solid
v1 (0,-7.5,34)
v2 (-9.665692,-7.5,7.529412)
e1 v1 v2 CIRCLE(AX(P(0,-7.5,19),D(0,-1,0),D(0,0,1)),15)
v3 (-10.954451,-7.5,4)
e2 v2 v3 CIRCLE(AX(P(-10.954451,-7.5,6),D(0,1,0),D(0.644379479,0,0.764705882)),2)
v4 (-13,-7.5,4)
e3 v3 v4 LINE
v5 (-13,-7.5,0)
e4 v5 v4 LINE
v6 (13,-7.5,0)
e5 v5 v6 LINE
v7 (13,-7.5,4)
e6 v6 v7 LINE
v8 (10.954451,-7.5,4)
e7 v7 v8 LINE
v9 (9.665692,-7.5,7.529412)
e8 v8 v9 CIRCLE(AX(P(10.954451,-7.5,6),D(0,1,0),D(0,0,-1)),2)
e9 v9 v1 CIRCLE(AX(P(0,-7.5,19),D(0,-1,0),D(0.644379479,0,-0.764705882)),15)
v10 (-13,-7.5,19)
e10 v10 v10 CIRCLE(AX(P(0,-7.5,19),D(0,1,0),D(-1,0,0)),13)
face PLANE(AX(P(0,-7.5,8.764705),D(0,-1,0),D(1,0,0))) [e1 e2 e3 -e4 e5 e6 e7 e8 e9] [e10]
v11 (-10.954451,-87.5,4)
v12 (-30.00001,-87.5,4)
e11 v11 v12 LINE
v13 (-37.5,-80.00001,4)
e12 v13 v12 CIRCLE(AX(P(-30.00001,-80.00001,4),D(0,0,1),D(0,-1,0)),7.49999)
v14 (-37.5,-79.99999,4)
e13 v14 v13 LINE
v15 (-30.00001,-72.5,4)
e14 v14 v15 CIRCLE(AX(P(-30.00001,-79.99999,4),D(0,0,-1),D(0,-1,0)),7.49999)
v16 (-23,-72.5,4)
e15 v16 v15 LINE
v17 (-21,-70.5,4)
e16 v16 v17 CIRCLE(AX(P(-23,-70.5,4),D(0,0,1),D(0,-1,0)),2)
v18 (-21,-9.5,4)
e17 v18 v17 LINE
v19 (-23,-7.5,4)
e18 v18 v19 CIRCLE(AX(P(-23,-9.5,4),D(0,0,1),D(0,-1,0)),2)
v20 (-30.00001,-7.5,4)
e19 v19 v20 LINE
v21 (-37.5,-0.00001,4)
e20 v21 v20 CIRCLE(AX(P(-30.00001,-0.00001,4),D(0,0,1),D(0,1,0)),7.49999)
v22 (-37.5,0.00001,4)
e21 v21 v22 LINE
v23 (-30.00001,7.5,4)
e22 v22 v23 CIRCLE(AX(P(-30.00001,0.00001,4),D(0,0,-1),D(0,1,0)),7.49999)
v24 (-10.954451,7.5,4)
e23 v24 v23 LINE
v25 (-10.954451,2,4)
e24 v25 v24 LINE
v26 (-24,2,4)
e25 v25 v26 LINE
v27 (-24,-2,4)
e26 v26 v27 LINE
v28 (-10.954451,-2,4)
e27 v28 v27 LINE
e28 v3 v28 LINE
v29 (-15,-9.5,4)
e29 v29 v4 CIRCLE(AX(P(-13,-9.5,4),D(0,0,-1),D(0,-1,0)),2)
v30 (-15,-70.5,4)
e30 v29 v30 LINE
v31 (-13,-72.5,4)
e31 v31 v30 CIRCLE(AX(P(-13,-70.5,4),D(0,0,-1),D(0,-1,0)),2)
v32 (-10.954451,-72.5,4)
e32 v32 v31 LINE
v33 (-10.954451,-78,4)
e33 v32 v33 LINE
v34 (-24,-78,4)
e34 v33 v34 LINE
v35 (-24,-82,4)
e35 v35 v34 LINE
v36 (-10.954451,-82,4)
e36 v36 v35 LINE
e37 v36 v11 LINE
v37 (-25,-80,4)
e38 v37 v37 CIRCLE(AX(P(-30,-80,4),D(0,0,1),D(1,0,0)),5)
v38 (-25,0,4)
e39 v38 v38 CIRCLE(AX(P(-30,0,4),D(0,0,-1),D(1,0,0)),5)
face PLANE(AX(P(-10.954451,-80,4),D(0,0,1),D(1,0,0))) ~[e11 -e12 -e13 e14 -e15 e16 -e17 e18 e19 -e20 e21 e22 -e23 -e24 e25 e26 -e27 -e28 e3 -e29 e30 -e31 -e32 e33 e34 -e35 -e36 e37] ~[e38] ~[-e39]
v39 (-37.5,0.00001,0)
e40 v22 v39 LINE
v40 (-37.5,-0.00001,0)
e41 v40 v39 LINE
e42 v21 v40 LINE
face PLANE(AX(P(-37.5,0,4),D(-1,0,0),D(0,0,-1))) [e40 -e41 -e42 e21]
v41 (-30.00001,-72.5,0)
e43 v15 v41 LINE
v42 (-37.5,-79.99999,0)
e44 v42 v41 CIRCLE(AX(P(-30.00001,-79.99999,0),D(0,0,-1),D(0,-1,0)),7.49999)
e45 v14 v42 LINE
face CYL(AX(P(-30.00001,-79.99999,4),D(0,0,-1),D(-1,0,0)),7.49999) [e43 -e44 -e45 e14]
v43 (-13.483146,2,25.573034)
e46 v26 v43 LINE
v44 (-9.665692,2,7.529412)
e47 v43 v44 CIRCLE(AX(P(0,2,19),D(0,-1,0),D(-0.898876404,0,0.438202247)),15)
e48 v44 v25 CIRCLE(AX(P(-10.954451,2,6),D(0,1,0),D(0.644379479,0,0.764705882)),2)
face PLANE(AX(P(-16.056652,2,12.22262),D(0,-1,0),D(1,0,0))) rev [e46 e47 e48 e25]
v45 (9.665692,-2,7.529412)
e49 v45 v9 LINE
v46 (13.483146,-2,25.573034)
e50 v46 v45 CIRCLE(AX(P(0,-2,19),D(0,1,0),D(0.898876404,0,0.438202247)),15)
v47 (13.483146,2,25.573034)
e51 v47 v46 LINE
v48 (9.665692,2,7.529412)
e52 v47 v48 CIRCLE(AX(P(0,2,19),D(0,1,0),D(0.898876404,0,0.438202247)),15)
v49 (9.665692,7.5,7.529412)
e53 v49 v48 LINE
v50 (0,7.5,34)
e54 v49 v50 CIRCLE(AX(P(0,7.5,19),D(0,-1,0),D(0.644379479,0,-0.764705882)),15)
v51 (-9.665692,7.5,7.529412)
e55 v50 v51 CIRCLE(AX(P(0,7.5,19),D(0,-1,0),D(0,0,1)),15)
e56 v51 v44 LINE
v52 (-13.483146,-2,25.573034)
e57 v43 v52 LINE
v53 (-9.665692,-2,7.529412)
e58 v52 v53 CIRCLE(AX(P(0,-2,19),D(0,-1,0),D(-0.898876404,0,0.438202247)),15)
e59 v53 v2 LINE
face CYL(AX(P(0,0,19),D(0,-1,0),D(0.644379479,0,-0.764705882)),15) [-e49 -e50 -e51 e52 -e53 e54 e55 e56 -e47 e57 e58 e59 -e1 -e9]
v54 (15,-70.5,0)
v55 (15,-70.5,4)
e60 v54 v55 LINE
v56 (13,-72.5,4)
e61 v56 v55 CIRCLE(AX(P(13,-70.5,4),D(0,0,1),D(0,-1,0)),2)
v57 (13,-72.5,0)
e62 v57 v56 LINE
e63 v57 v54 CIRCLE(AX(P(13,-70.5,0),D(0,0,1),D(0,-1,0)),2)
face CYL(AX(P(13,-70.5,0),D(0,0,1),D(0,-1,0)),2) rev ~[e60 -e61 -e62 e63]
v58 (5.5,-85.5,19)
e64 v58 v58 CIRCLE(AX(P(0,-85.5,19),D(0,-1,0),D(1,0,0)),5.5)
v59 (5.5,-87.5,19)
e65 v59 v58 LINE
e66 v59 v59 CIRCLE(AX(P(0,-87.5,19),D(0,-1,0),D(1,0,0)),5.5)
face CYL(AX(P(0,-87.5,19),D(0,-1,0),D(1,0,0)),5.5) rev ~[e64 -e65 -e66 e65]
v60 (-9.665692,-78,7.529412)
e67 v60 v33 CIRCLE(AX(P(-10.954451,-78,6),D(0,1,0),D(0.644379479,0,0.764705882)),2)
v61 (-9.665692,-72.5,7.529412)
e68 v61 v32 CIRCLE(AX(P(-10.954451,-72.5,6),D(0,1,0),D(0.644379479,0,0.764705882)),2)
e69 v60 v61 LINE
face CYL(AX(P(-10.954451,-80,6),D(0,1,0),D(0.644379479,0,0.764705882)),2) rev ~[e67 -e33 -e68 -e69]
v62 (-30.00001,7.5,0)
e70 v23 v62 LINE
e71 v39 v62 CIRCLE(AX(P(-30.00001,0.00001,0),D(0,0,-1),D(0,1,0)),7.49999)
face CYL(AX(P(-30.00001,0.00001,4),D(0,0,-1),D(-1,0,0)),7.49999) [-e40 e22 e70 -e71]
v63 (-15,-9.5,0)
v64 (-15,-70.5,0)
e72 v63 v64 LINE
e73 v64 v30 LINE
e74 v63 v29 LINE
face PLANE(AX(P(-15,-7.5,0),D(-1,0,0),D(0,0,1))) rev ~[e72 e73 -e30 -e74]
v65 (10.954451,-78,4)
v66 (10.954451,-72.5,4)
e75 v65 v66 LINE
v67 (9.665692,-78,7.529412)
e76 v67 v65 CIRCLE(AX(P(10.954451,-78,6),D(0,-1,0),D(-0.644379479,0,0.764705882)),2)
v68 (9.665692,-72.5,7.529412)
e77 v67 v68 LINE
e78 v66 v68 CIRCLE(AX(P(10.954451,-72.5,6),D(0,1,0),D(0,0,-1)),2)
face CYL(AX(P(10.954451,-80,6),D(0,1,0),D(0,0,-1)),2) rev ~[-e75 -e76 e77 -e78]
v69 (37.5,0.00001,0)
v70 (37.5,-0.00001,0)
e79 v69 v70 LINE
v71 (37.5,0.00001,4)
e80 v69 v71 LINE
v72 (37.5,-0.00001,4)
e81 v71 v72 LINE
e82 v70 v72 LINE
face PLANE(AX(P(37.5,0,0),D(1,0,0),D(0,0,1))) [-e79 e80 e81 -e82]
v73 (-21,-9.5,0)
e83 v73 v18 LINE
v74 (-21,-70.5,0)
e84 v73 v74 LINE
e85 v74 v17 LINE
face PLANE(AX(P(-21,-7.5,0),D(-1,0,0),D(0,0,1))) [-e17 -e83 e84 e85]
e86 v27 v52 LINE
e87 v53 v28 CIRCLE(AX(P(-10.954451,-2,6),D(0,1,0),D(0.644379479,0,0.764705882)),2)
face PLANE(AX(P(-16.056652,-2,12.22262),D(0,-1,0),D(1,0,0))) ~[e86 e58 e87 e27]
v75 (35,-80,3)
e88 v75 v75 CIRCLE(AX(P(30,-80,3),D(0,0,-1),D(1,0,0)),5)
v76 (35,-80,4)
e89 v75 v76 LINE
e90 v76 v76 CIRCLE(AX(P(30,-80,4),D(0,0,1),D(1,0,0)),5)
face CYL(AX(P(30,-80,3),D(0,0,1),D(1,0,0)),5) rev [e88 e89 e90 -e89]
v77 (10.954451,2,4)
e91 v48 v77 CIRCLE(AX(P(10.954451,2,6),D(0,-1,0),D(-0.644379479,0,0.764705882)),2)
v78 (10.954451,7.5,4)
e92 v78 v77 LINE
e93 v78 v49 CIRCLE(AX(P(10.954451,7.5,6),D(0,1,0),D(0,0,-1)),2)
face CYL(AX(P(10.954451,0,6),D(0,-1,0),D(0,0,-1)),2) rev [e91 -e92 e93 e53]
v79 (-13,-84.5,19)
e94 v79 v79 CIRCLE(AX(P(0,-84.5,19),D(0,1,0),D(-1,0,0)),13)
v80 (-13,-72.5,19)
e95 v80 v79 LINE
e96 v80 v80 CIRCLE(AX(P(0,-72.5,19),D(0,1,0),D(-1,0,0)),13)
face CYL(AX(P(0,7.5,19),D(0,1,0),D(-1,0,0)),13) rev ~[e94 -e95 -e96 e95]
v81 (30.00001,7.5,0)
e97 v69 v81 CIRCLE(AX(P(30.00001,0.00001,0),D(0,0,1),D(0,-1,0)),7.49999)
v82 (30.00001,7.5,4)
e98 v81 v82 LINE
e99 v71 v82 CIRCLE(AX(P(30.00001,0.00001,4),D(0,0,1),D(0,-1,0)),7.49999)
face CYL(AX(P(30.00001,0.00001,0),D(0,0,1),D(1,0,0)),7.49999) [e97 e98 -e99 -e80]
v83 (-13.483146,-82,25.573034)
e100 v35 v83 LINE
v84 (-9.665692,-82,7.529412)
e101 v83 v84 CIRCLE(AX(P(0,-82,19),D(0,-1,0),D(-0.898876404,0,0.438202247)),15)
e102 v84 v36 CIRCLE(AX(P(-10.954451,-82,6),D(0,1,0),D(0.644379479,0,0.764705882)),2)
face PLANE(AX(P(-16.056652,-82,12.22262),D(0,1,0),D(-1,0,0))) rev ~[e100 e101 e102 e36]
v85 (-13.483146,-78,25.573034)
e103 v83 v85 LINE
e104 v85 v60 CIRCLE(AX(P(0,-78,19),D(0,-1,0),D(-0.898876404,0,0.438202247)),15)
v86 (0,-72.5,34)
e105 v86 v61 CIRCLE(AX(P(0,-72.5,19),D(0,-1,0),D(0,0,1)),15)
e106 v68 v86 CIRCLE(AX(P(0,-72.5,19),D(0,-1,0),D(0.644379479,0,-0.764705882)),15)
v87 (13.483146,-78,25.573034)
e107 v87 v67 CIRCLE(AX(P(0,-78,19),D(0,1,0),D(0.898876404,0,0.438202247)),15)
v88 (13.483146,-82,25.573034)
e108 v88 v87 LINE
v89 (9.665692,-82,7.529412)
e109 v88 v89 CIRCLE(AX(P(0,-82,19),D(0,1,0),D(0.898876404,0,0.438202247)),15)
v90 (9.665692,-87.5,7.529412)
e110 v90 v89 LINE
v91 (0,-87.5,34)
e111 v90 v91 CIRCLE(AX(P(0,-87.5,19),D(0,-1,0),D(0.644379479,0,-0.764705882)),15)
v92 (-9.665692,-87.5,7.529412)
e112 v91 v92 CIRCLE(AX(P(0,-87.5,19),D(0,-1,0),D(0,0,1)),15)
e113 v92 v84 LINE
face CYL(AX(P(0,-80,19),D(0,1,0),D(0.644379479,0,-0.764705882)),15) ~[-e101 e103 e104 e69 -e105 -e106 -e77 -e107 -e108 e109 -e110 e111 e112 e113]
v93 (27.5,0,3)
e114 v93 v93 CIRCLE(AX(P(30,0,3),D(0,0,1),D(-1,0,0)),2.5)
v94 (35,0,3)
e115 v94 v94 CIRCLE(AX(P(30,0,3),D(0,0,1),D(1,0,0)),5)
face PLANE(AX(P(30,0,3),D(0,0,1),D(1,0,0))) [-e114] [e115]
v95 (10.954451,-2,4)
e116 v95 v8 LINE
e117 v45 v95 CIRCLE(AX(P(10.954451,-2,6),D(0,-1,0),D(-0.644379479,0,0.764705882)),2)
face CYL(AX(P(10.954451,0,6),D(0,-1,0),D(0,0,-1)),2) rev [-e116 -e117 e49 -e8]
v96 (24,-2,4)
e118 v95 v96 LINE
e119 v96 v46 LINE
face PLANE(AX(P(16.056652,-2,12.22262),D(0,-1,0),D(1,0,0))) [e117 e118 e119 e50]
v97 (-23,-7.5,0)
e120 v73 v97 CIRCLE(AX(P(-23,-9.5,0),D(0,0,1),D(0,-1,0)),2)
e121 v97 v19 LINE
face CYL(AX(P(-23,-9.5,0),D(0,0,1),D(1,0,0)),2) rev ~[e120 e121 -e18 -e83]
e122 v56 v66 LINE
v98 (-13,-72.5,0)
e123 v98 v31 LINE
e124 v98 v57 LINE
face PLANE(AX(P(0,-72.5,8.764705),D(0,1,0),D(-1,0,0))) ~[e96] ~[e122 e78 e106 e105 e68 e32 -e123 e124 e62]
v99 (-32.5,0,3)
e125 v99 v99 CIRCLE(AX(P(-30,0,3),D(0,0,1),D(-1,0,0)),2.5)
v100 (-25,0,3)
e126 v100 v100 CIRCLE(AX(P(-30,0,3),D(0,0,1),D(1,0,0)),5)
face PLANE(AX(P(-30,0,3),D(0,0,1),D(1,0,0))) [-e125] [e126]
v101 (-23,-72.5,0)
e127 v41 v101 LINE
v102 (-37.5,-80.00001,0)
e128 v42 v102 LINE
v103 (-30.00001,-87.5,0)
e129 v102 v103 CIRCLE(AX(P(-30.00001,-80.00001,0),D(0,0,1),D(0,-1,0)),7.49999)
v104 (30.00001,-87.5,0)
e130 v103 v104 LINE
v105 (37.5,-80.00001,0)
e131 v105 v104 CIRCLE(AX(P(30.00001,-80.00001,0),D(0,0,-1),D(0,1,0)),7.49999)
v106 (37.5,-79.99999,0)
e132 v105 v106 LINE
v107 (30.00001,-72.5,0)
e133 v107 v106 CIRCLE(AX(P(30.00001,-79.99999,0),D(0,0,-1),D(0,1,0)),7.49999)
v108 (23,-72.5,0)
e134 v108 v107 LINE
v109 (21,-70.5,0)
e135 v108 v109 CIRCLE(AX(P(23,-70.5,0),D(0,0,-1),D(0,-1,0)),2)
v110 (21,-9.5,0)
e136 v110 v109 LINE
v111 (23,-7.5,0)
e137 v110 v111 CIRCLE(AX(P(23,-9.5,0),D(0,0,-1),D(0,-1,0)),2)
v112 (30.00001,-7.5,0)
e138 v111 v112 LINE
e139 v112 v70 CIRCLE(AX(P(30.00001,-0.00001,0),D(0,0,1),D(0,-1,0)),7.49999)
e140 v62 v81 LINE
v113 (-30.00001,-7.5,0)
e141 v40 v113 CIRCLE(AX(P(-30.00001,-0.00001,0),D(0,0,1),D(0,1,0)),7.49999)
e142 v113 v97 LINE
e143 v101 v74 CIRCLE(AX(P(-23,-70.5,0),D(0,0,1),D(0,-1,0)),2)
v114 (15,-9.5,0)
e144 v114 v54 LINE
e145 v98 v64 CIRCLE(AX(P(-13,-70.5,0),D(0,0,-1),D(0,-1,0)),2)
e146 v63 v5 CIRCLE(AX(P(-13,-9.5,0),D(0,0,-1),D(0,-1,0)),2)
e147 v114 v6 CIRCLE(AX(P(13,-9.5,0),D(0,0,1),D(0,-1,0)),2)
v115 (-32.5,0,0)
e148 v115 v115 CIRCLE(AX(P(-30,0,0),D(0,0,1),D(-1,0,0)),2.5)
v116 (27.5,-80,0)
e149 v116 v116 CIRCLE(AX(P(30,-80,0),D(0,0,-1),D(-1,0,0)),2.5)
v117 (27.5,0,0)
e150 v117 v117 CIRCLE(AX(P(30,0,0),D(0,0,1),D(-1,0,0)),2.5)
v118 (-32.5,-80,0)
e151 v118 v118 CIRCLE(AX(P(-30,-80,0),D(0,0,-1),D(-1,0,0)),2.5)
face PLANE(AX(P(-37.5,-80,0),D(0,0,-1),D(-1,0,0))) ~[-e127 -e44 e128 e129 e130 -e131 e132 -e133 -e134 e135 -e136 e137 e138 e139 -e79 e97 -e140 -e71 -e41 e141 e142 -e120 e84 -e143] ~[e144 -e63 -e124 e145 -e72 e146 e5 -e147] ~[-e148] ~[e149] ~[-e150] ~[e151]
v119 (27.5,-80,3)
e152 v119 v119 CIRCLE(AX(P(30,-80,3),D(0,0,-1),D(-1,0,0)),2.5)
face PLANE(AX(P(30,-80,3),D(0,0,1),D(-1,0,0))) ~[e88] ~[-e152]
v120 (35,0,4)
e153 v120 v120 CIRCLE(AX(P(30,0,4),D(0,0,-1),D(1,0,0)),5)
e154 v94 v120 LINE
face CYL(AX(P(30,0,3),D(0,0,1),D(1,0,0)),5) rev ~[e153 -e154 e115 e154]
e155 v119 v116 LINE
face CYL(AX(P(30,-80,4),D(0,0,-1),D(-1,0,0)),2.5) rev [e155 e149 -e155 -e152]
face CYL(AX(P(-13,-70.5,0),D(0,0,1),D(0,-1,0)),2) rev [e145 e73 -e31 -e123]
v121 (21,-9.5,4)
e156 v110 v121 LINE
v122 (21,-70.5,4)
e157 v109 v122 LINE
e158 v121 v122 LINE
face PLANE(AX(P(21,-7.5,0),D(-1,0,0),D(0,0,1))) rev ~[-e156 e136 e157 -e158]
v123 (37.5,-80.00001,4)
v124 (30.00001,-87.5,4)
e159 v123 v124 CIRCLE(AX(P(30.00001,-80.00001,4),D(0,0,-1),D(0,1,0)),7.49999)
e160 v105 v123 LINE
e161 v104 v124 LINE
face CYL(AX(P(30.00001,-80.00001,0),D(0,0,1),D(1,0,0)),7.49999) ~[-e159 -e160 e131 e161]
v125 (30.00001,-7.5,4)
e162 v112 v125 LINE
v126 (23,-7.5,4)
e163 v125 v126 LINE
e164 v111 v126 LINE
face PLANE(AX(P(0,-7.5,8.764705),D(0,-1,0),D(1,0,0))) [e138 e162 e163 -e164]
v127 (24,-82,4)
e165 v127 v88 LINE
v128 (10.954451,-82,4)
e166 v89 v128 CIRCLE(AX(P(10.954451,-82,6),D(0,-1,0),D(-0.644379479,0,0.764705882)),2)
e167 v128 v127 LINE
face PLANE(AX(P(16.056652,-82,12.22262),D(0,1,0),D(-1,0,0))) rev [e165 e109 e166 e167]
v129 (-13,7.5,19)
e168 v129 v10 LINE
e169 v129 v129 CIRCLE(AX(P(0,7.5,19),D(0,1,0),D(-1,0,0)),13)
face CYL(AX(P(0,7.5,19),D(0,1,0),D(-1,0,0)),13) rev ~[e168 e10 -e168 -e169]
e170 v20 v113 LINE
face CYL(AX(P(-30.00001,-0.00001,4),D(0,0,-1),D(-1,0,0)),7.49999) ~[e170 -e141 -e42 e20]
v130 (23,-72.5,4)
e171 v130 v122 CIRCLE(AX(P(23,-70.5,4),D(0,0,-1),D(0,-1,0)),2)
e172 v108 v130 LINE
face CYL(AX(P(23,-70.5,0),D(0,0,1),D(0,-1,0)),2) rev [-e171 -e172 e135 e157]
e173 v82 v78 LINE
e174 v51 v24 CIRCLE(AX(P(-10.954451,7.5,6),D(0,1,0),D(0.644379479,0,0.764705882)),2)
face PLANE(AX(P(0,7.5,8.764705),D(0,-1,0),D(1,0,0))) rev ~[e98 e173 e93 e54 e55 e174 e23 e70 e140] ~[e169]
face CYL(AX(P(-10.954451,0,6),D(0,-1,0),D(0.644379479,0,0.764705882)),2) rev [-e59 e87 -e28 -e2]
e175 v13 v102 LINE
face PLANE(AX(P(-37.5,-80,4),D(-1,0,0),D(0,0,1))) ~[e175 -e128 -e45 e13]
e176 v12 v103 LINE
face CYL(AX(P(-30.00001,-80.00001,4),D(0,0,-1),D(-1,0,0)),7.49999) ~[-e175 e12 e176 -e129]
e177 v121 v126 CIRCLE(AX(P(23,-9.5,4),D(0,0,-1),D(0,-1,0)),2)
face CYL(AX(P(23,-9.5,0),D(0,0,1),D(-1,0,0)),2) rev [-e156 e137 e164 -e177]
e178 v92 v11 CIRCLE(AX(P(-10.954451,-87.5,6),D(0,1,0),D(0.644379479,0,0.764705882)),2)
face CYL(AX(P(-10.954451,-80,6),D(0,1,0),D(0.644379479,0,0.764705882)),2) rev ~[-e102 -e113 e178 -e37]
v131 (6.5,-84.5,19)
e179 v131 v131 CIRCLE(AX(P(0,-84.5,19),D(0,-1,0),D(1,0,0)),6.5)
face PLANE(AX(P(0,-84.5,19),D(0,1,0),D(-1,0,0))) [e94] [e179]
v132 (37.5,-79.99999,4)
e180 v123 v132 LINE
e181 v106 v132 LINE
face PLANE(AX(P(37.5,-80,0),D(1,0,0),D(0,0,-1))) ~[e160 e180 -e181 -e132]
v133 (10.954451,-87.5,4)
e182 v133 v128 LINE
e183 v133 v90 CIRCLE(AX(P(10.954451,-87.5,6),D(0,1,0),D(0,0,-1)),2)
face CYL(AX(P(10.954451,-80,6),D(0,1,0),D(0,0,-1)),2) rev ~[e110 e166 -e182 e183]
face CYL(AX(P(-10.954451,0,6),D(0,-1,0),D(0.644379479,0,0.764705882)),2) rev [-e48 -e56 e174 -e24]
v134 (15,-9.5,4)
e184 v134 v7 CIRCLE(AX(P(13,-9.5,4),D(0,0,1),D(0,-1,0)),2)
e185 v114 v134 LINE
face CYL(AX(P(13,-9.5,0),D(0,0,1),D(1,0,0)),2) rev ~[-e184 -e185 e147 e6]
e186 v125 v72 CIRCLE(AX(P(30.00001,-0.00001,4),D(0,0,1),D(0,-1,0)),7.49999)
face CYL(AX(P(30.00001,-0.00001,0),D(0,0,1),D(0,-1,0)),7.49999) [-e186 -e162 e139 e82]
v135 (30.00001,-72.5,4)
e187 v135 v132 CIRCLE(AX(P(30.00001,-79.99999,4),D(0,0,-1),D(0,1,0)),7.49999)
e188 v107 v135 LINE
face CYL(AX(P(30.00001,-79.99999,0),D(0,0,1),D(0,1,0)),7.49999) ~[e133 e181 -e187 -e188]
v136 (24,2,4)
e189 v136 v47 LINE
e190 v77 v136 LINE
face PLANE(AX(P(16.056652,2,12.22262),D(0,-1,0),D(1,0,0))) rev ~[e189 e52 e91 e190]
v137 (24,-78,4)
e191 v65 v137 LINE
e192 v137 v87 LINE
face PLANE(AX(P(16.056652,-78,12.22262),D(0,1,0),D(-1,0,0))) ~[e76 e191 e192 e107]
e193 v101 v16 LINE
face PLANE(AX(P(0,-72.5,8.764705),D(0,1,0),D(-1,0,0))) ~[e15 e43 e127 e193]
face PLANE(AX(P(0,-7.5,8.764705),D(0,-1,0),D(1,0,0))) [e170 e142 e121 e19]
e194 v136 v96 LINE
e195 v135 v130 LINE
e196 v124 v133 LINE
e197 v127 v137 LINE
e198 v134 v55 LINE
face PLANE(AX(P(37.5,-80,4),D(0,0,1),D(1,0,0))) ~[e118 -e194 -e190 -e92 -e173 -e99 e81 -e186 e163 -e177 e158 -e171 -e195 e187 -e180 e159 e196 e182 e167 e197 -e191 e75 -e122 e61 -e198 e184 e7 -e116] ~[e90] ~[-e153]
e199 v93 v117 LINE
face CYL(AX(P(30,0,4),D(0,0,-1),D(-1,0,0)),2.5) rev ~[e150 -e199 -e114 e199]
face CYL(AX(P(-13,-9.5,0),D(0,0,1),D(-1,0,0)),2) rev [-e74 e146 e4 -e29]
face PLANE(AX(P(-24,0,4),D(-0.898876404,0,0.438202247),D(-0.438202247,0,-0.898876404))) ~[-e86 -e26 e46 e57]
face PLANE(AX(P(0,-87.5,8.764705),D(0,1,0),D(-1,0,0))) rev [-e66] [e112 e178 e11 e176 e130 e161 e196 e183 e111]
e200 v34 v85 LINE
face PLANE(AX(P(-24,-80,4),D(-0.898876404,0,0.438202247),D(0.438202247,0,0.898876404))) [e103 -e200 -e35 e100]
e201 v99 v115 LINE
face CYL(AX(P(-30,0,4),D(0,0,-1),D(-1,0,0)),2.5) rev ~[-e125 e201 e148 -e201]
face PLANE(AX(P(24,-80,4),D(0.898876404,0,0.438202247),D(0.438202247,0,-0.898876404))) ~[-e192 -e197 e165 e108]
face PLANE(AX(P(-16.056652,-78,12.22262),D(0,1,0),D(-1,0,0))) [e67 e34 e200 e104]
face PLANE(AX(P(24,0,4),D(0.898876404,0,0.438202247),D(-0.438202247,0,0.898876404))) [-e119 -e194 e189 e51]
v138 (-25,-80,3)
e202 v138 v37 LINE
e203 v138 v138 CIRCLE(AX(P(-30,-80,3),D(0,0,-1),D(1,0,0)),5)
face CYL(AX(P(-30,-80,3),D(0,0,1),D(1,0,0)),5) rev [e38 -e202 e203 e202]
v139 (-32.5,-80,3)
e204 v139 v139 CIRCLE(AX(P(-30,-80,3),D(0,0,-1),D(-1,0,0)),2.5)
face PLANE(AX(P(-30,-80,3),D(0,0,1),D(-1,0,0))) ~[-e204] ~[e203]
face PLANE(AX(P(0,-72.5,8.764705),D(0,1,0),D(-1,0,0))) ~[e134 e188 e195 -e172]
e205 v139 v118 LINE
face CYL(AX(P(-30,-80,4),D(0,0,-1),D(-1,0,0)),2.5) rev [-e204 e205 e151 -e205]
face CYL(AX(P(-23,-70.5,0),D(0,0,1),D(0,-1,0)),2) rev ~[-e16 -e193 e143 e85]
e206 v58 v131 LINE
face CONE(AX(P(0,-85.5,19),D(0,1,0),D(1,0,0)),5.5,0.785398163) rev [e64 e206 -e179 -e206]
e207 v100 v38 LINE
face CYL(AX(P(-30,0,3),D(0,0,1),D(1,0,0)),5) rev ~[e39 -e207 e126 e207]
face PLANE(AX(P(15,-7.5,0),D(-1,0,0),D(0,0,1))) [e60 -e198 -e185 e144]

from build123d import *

# Parameters (mm, degrees)
F3_DEPTH       = 7.5
F4_R           = 7.49999
F6_D           = 5
F6_CBORE_D     = 10
F6_CBORE_DEPTH = 1
F8_DEPTH       = 2
F12_R          = 13
F13_DEPTH      = 92
F14_R          = 5.5
F15_DEPTH      = 95.001
F16_W          = 6
F16_H          = 4
F17_DEPTH      = 65
F18_R          = 2
F19_SIZE       = 1


# Not quite as in the source:
# - a fillet or chamfer is up to 0.001 mm smaller than in the source, because OpenCascade refuses the exact size


with BuildPart() as f3:
    # F2 (on Front) → F3 (new body, symmetric)
    with BuildSketch(Plane.XZ):
        with BuildLine():
            Line((-37.5, 0), (0, 0))
            Line((0, 0), (37.5, 0))
            Line((37.5, 0), (37.5, 4))
            Line((37.5, 4), (10.9544511501, 4))
            ThreePointArc((10.9544511501, 4), (9.0757782768, 5.3140056594), (9.6656921913, 7.5294117647))
            ThreePointArc((9.6656921913, 7.5294117647), (14.0900465494, 24.1449575543), (0, 34))
            ThreePointArc((0, 34), (-14.0900465494, 24.1449575543), (-9.6656921913, 7.5294117647))
            ThreePointArc((-9.6656921913, 7.5294117647), (-9.0757782768, 5.3140056594), (-10.9544511501, 4))
            Line((-10.9544511501, 4), (-37.5, 4))
            Line((-37.5, 4), (-37.5, 0))
        make_face()
    extrude(amount=F3_DEPTH, both=True)

    # F4 (radius 7.5 in the source; OpenCascade refuses exactly that, so slightly less here)
    f4_edges = [f3.edges().sort_by_distance(p)[0] for p in [
        (37.5, -7.5, 2),
        (37.5, 7.5, 2),
        (-37.5, -7.5, 2),
        (-37.5, 7.5, 2),
    ]]
    fillet(f4_edges, radius=F4_R)

    # F6 (through all)
    with Locations(Plane.XY.offset(4)):
        with Locations((30, 0), (-30, 0)):
            CounterBoreHole(F6_D / 2, F6_CBORE_D / 2, F6_CBORE_DEPTH)

    # F7 (on Front) → F8 (join, symmetric)
    with BuildSketch(Plane.XZ):
        with BuildLine():
            Line((10.9544511501, 4), (24, 4))
            Line((24, 4), (13.4831460674, 25.5730337079))
            ThreePointArc((13.4831460674, 25.5730337079), (14.6751576274, 15.8952055444), (9.6656921913, 7.5294117647))
            ThreePointArc((9.6656921913, 7.5294117647), (9.0757782768, 5.3140056594), (10.9544511501, 4))
        make_face()
    extrude(amount=F8_DEPTH, both=True)

    # F9: F3 across plane


with BuildPart() as f3_1:
    add(f3.part)
    add(f3.part.mirror(Plane.YZ))


with BuildPart() as f11_1:
    # F11: instance of F3
    add(f3_1.part.mirror(Plane.XZ.offset(40)))


with BuildPart() as f13_tool:
    # F12 (on face) → F13 (new body)
    with BuildSketch(Plane(origin=(0, 7.5, 0), x_dir=(-1, 0, 0), z_dir=(0, 1, 0))):
        with Locations((0, 19)):
            Circle(F12_R)
    extrude(amount=-F13_DEPTH)


with BuildPart() as f3_2:
    add(f3_1.part)

    # F13: cut by f13_tool
    add(f13_tool.part, mode=Mode.SUBTRACT)



with BuildPart() as f11_1_1:
    add(f11_1.part)

    # F13: cut by f13_tool
    add(f13_tool.part, mode=Mode.SUBTRACT)

    # F14 (on face) → F15 (cut, through all)
    with BuildSketch(Plane.XZ.offset(87.5)):
        with Locations((0, 19)):
            Circle(F14_R)
    extrude(amount=-F15_DEPTH, mode=Mode.SUBTRACT)


with BuildPart() as f3_3:
    add(f3_2.part)

    add(f11_1_1.part)  # F17 merges F11_1
    # F16 (on face) → F17 (join, through all)
    with BuildSketch(Plane.XZ.offset(7.5)):
        with Locations((18, 2)):
            Rectangle(F16_W, F16_H)
        with Locations((-18, 2)):
            Rectangle(F16_W, F16_H)
    extrude(amount=F17_DEPTH)

    # F18
    f18_edges = [f3_3.edges().sort_by_distance(p)[0] for p in [
        (21, -7.5, 2),
        (15, -7.5, 2),
        (21, -72.5, 2),
        (15, -72.5, 2),
        (-21, -7.5, 2),
        (-21, -72.5, 2),
        (-15, -72.5, 2),
        (-15, -7.5, 2),
    ]]
    fillet(f18_edges, radius=F18_R)

    # F19
    f19_edges = [f3_3.edges().sort_by_distance(p)[0] for p in [
        (-5.5, -84.5, 19),
    ]]
    chamfer(f19_edges, length=F19_SIZE)


solid = f3_3.part
